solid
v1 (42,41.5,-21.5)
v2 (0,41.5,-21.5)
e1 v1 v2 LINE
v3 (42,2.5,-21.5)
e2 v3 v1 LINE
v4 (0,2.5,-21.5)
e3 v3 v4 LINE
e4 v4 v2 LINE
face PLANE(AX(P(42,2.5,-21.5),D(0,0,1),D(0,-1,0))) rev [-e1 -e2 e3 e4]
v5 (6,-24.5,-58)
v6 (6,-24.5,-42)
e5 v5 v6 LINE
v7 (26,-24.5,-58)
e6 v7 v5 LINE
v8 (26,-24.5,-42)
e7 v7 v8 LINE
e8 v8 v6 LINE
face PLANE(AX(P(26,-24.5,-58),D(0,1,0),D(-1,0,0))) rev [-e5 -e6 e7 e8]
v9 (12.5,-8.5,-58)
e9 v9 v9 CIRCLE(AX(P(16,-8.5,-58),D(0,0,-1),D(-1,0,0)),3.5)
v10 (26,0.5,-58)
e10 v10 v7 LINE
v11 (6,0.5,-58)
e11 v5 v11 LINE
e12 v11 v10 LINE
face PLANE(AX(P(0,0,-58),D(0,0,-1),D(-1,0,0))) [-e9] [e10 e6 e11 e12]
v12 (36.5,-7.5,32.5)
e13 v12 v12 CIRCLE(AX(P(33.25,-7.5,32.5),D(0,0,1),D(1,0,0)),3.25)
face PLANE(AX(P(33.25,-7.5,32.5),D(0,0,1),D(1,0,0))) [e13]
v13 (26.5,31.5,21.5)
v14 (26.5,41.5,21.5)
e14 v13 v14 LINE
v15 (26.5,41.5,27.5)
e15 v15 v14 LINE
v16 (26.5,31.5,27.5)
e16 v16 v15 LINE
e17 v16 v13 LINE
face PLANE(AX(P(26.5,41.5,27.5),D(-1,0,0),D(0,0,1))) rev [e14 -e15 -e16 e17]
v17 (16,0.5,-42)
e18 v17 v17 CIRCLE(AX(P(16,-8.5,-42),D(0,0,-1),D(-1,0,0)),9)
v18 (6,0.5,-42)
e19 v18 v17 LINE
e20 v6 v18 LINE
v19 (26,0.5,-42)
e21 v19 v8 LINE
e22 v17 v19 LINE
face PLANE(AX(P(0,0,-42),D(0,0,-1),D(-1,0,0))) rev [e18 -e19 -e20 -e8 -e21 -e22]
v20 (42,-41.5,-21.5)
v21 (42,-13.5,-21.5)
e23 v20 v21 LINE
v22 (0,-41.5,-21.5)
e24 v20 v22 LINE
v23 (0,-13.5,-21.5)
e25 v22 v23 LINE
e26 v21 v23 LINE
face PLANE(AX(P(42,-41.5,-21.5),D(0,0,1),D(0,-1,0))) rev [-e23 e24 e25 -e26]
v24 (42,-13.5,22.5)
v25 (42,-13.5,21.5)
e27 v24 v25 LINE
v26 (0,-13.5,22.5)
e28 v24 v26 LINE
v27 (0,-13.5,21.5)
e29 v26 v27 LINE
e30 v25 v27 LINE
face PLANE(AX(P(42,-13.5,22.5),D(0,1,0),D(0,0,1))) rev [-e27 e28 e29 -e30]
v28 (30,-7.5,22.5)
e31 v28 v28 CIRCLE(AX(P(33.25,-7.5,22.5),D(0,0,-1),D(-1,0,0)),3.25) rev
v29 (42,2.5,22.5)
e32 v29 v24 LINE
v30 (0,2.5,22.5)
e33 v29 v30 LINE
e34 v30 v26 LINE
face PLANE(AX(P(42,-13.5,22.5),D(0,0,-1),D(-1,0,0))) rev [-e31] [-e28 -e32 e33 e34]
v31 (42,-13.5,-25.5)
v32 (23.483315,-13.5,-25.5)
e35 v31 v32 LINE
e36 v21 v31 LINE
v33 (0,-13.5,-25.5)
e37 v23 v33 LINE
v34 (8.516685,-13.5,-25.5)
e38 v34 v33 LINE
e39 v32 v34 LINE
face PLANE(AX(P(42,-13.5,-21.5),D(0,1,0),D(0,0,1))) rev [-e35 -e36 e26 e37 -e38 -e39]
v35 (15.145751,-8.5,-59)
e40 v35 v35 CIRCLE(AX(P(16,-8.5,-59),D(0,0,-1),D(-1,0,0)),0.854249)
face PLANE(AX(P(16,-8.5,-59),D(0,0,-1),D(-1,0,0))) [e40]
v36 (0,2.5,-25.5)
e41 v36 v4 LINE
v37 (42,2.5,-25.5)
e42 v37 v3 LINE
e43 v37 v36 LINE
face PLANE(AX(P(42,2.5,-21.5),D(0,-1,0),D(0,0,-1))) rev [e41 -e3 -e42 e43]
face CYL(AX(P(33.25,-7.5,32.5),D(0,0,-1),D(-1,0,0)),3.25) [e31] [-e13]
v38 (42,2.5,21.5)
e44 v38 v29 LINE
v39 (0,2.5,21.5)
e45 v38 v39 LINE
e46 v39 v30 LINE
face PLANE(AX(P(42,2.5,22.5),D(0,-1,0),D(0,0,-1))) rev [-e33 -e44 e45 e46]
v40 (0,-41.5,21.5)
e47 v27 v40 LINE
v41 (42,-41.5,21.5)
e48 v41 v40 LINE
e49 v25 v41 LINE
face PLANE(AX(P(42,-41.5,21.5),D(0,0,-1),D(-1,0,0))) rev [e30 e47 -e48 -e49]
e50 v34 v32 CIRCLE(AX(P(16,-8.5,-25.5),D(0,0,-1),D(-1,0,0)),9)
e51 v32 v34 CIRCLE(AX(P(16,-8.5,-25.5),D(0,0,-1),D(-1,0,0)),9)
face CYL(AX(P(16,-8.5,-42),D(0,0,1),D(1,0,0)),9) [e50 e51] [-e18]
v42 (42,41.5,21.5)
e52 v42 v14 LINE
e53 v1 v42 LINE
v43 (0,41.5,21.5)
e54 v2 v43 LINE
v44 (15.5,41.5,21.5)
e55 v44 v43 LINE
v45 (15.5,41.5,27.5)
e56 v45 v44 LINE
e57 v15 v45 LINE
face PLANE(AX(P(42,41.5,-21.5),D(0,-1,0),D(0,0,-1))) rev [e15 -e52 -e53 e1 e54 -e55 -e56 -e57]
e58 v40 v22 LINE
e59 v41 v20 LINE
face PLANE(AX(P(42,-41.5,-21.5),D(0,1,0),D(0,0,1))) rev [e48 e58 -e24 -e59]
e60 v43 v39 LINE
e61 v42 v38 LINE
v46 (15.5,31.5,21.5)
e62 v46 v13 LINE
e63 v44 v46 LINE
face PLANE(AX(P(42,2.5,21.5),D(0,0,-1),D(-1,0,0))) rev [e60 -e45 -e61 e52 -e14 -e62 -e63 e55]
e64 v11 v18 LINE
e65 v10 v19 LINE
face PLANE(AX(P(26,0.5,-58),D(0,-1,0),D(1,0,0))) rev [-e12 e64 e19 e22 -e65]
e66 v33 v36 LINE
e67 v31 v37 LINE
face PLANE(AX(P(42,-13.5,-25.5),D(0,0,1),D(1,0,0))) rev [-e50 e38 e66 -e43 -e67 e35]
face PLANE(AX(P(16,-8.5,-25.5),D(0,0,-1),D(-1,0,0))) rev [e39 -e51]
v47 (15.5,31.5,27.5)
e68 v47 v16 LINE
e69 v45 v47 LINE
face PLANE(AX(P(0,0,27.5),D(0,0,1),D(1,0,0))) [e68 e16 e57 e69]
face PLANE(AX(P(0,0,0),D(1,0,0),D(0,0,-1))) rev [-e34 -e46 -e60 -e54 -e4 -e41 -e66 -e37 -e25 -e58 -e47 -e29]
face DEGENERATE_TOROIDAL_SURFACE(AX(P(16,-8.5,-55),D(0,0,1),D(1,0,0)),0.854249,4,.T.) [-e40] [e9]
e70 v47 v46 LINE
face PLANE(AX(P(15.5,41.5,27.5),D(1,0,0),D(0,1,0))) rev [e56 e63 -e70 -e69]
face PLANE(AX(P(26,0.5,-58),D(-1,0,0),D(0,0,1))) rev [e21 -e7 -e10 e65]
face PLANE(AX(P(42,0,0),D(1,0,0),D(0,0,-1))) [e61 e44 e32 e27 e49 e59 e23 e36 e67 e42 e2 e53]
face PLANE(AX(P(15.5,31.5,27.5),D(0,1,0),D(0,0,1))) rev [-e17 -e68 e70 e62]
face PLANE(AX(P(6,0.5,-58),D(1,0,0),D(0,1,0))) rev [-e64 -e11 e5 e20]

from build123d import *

# Parameters (mm, degrees)
SALIENTE_EXTRUIR1_DEPTH = 42
CROQUIS2_W              = 11
CROQUIS2_H              = 10
SALIENTE_EXTRUIR2_DEPTH = 6
CROQUIS3_R              = 3.25
SALIENTE_EXTRUIR3_DEPTH = 10
CROQUIS4_R              = 9
SALIENTE_EXTRUIR4_DEPTH = 16.5
CROQUIS5_W              = 20
CROQUIS5_H              = 25
SALIENTE_EXTRUIR5_DEPTH = 16
CROQUIS6_R              = 3.5
SALIENTE_EXTRUIR6_DEPTH = 1
REDONDEO2_R             = 4


with BuildPart() as part:
    # Croquis1 → Saliente-Extruir1 (new body)
    with BuildSketch(Plane(origin=(0, 0, 0), x_dir=(0, 0, -1), z_dir=(1, 0, 0))):
        Polygon((21.5, 2.5), (25.5, 2.5), (25.5, -13.5), (21.5, -13.5), (21.5, -41.5), (-21.5, -41.5), (-21.5, -13.5), (-22.5, -13.5), (-22.5, 2.5), (-21.5, 2.5), (-21.5, 41.5), (21.5, 41.5), align=None)
    extrude(amount=SALIENTE_EXTRUIR1_DEPTH)

    # Croquis2 → Saliente-Extruir2 (add)
    with BuildSketch(Plane.XY.offset(21.5)):
        with Locations((21, 36.5)):
            Rectangle(CROQUIS2_W, CROQUIS2_H)
    extrude(amount=SALIENTE_EXTRUIR2_DEPTH)

    # Croquis3 → Saliente-Extruir3 (add)
    with BuildSketch(Plane.XY.offset(22.5)):
        with Locations(Location((33.25, -7.5, 0), (0, 0, 180))):
            Circle(CROQUIS3_R)
    extrude(amount=SALIENTE_EXTRUIR3_DEPTH)

    # Croquis4 → Saliente-Extruir4 (add)
    with BuildSketch(Plane(origin=(0, 0, -25.5), x_dir=(-1, 0, 0), z_dir=(0, 0, -1))):
        with Locations(Location((-16, -8.5, 0), (0, 0, 213.748988596))):
            Circle(CROQUIS4_R)
    extrude(amount=SALIENTE_EXTRUIR4_DEPTH)

    # Croquis5 → Saliente-Extruir5 (add)
    with BuildSketch(Plane(origin=(0, 0, -42), x_dir=(-1, 0, 0), z_dir=(0, 0, -1))):
        with Locations((-16, -12)):
            Rectangle(CROQUIS5_W, CROQUIS5_H)
    extrude(amount=SALIENTE_EXTRUIR5_DEPTH)

    # Croquis6 → Saliente-Extruir6 (add)
    with BuildSketch(Plane(origin=(0, 0, -58), x_dir=(-1, 0, 0), z_dir=(0, 0, -1))):
        with Locations((-16, -8.5)):
            Circle(CROQUIS6_R)
    extrude(amount=SALIENTE_EXTRUIR6_DEPTH)

    # Redondeo2
    # the kernel refuses this fillet: 4 mm, written as the material it takes off along each edge
    with BuildSketch(Plane(origin=(16, -8.5, -59), x_dir=(-1, 0, 0), z_dir=(0, -1, 0))) as redondeo2_piece_1:
        with BuildLine():
            CenterArc((0.854248689, -4), REDONDEO2_R, 48.590377891, 41.409622109)
            Line((0.854248689, 0), (0.854248689, 0.08))
            Line((0.854248689, 0.08), (3.5, 0.08))
            Line((3.5, 0.08), (3.58, 0))
            ThreePointArc((3.58, 0), (3.58, -0.5), (3.552915026, -0.94))
            Line((3.552915026, -0.94), (3.5, -1))
        make_face()
    revolve(axis=Axis((16, -8.5, -59), (0, 0, -1)), mode=Mode.SUBTRACT)


solid = part.part
